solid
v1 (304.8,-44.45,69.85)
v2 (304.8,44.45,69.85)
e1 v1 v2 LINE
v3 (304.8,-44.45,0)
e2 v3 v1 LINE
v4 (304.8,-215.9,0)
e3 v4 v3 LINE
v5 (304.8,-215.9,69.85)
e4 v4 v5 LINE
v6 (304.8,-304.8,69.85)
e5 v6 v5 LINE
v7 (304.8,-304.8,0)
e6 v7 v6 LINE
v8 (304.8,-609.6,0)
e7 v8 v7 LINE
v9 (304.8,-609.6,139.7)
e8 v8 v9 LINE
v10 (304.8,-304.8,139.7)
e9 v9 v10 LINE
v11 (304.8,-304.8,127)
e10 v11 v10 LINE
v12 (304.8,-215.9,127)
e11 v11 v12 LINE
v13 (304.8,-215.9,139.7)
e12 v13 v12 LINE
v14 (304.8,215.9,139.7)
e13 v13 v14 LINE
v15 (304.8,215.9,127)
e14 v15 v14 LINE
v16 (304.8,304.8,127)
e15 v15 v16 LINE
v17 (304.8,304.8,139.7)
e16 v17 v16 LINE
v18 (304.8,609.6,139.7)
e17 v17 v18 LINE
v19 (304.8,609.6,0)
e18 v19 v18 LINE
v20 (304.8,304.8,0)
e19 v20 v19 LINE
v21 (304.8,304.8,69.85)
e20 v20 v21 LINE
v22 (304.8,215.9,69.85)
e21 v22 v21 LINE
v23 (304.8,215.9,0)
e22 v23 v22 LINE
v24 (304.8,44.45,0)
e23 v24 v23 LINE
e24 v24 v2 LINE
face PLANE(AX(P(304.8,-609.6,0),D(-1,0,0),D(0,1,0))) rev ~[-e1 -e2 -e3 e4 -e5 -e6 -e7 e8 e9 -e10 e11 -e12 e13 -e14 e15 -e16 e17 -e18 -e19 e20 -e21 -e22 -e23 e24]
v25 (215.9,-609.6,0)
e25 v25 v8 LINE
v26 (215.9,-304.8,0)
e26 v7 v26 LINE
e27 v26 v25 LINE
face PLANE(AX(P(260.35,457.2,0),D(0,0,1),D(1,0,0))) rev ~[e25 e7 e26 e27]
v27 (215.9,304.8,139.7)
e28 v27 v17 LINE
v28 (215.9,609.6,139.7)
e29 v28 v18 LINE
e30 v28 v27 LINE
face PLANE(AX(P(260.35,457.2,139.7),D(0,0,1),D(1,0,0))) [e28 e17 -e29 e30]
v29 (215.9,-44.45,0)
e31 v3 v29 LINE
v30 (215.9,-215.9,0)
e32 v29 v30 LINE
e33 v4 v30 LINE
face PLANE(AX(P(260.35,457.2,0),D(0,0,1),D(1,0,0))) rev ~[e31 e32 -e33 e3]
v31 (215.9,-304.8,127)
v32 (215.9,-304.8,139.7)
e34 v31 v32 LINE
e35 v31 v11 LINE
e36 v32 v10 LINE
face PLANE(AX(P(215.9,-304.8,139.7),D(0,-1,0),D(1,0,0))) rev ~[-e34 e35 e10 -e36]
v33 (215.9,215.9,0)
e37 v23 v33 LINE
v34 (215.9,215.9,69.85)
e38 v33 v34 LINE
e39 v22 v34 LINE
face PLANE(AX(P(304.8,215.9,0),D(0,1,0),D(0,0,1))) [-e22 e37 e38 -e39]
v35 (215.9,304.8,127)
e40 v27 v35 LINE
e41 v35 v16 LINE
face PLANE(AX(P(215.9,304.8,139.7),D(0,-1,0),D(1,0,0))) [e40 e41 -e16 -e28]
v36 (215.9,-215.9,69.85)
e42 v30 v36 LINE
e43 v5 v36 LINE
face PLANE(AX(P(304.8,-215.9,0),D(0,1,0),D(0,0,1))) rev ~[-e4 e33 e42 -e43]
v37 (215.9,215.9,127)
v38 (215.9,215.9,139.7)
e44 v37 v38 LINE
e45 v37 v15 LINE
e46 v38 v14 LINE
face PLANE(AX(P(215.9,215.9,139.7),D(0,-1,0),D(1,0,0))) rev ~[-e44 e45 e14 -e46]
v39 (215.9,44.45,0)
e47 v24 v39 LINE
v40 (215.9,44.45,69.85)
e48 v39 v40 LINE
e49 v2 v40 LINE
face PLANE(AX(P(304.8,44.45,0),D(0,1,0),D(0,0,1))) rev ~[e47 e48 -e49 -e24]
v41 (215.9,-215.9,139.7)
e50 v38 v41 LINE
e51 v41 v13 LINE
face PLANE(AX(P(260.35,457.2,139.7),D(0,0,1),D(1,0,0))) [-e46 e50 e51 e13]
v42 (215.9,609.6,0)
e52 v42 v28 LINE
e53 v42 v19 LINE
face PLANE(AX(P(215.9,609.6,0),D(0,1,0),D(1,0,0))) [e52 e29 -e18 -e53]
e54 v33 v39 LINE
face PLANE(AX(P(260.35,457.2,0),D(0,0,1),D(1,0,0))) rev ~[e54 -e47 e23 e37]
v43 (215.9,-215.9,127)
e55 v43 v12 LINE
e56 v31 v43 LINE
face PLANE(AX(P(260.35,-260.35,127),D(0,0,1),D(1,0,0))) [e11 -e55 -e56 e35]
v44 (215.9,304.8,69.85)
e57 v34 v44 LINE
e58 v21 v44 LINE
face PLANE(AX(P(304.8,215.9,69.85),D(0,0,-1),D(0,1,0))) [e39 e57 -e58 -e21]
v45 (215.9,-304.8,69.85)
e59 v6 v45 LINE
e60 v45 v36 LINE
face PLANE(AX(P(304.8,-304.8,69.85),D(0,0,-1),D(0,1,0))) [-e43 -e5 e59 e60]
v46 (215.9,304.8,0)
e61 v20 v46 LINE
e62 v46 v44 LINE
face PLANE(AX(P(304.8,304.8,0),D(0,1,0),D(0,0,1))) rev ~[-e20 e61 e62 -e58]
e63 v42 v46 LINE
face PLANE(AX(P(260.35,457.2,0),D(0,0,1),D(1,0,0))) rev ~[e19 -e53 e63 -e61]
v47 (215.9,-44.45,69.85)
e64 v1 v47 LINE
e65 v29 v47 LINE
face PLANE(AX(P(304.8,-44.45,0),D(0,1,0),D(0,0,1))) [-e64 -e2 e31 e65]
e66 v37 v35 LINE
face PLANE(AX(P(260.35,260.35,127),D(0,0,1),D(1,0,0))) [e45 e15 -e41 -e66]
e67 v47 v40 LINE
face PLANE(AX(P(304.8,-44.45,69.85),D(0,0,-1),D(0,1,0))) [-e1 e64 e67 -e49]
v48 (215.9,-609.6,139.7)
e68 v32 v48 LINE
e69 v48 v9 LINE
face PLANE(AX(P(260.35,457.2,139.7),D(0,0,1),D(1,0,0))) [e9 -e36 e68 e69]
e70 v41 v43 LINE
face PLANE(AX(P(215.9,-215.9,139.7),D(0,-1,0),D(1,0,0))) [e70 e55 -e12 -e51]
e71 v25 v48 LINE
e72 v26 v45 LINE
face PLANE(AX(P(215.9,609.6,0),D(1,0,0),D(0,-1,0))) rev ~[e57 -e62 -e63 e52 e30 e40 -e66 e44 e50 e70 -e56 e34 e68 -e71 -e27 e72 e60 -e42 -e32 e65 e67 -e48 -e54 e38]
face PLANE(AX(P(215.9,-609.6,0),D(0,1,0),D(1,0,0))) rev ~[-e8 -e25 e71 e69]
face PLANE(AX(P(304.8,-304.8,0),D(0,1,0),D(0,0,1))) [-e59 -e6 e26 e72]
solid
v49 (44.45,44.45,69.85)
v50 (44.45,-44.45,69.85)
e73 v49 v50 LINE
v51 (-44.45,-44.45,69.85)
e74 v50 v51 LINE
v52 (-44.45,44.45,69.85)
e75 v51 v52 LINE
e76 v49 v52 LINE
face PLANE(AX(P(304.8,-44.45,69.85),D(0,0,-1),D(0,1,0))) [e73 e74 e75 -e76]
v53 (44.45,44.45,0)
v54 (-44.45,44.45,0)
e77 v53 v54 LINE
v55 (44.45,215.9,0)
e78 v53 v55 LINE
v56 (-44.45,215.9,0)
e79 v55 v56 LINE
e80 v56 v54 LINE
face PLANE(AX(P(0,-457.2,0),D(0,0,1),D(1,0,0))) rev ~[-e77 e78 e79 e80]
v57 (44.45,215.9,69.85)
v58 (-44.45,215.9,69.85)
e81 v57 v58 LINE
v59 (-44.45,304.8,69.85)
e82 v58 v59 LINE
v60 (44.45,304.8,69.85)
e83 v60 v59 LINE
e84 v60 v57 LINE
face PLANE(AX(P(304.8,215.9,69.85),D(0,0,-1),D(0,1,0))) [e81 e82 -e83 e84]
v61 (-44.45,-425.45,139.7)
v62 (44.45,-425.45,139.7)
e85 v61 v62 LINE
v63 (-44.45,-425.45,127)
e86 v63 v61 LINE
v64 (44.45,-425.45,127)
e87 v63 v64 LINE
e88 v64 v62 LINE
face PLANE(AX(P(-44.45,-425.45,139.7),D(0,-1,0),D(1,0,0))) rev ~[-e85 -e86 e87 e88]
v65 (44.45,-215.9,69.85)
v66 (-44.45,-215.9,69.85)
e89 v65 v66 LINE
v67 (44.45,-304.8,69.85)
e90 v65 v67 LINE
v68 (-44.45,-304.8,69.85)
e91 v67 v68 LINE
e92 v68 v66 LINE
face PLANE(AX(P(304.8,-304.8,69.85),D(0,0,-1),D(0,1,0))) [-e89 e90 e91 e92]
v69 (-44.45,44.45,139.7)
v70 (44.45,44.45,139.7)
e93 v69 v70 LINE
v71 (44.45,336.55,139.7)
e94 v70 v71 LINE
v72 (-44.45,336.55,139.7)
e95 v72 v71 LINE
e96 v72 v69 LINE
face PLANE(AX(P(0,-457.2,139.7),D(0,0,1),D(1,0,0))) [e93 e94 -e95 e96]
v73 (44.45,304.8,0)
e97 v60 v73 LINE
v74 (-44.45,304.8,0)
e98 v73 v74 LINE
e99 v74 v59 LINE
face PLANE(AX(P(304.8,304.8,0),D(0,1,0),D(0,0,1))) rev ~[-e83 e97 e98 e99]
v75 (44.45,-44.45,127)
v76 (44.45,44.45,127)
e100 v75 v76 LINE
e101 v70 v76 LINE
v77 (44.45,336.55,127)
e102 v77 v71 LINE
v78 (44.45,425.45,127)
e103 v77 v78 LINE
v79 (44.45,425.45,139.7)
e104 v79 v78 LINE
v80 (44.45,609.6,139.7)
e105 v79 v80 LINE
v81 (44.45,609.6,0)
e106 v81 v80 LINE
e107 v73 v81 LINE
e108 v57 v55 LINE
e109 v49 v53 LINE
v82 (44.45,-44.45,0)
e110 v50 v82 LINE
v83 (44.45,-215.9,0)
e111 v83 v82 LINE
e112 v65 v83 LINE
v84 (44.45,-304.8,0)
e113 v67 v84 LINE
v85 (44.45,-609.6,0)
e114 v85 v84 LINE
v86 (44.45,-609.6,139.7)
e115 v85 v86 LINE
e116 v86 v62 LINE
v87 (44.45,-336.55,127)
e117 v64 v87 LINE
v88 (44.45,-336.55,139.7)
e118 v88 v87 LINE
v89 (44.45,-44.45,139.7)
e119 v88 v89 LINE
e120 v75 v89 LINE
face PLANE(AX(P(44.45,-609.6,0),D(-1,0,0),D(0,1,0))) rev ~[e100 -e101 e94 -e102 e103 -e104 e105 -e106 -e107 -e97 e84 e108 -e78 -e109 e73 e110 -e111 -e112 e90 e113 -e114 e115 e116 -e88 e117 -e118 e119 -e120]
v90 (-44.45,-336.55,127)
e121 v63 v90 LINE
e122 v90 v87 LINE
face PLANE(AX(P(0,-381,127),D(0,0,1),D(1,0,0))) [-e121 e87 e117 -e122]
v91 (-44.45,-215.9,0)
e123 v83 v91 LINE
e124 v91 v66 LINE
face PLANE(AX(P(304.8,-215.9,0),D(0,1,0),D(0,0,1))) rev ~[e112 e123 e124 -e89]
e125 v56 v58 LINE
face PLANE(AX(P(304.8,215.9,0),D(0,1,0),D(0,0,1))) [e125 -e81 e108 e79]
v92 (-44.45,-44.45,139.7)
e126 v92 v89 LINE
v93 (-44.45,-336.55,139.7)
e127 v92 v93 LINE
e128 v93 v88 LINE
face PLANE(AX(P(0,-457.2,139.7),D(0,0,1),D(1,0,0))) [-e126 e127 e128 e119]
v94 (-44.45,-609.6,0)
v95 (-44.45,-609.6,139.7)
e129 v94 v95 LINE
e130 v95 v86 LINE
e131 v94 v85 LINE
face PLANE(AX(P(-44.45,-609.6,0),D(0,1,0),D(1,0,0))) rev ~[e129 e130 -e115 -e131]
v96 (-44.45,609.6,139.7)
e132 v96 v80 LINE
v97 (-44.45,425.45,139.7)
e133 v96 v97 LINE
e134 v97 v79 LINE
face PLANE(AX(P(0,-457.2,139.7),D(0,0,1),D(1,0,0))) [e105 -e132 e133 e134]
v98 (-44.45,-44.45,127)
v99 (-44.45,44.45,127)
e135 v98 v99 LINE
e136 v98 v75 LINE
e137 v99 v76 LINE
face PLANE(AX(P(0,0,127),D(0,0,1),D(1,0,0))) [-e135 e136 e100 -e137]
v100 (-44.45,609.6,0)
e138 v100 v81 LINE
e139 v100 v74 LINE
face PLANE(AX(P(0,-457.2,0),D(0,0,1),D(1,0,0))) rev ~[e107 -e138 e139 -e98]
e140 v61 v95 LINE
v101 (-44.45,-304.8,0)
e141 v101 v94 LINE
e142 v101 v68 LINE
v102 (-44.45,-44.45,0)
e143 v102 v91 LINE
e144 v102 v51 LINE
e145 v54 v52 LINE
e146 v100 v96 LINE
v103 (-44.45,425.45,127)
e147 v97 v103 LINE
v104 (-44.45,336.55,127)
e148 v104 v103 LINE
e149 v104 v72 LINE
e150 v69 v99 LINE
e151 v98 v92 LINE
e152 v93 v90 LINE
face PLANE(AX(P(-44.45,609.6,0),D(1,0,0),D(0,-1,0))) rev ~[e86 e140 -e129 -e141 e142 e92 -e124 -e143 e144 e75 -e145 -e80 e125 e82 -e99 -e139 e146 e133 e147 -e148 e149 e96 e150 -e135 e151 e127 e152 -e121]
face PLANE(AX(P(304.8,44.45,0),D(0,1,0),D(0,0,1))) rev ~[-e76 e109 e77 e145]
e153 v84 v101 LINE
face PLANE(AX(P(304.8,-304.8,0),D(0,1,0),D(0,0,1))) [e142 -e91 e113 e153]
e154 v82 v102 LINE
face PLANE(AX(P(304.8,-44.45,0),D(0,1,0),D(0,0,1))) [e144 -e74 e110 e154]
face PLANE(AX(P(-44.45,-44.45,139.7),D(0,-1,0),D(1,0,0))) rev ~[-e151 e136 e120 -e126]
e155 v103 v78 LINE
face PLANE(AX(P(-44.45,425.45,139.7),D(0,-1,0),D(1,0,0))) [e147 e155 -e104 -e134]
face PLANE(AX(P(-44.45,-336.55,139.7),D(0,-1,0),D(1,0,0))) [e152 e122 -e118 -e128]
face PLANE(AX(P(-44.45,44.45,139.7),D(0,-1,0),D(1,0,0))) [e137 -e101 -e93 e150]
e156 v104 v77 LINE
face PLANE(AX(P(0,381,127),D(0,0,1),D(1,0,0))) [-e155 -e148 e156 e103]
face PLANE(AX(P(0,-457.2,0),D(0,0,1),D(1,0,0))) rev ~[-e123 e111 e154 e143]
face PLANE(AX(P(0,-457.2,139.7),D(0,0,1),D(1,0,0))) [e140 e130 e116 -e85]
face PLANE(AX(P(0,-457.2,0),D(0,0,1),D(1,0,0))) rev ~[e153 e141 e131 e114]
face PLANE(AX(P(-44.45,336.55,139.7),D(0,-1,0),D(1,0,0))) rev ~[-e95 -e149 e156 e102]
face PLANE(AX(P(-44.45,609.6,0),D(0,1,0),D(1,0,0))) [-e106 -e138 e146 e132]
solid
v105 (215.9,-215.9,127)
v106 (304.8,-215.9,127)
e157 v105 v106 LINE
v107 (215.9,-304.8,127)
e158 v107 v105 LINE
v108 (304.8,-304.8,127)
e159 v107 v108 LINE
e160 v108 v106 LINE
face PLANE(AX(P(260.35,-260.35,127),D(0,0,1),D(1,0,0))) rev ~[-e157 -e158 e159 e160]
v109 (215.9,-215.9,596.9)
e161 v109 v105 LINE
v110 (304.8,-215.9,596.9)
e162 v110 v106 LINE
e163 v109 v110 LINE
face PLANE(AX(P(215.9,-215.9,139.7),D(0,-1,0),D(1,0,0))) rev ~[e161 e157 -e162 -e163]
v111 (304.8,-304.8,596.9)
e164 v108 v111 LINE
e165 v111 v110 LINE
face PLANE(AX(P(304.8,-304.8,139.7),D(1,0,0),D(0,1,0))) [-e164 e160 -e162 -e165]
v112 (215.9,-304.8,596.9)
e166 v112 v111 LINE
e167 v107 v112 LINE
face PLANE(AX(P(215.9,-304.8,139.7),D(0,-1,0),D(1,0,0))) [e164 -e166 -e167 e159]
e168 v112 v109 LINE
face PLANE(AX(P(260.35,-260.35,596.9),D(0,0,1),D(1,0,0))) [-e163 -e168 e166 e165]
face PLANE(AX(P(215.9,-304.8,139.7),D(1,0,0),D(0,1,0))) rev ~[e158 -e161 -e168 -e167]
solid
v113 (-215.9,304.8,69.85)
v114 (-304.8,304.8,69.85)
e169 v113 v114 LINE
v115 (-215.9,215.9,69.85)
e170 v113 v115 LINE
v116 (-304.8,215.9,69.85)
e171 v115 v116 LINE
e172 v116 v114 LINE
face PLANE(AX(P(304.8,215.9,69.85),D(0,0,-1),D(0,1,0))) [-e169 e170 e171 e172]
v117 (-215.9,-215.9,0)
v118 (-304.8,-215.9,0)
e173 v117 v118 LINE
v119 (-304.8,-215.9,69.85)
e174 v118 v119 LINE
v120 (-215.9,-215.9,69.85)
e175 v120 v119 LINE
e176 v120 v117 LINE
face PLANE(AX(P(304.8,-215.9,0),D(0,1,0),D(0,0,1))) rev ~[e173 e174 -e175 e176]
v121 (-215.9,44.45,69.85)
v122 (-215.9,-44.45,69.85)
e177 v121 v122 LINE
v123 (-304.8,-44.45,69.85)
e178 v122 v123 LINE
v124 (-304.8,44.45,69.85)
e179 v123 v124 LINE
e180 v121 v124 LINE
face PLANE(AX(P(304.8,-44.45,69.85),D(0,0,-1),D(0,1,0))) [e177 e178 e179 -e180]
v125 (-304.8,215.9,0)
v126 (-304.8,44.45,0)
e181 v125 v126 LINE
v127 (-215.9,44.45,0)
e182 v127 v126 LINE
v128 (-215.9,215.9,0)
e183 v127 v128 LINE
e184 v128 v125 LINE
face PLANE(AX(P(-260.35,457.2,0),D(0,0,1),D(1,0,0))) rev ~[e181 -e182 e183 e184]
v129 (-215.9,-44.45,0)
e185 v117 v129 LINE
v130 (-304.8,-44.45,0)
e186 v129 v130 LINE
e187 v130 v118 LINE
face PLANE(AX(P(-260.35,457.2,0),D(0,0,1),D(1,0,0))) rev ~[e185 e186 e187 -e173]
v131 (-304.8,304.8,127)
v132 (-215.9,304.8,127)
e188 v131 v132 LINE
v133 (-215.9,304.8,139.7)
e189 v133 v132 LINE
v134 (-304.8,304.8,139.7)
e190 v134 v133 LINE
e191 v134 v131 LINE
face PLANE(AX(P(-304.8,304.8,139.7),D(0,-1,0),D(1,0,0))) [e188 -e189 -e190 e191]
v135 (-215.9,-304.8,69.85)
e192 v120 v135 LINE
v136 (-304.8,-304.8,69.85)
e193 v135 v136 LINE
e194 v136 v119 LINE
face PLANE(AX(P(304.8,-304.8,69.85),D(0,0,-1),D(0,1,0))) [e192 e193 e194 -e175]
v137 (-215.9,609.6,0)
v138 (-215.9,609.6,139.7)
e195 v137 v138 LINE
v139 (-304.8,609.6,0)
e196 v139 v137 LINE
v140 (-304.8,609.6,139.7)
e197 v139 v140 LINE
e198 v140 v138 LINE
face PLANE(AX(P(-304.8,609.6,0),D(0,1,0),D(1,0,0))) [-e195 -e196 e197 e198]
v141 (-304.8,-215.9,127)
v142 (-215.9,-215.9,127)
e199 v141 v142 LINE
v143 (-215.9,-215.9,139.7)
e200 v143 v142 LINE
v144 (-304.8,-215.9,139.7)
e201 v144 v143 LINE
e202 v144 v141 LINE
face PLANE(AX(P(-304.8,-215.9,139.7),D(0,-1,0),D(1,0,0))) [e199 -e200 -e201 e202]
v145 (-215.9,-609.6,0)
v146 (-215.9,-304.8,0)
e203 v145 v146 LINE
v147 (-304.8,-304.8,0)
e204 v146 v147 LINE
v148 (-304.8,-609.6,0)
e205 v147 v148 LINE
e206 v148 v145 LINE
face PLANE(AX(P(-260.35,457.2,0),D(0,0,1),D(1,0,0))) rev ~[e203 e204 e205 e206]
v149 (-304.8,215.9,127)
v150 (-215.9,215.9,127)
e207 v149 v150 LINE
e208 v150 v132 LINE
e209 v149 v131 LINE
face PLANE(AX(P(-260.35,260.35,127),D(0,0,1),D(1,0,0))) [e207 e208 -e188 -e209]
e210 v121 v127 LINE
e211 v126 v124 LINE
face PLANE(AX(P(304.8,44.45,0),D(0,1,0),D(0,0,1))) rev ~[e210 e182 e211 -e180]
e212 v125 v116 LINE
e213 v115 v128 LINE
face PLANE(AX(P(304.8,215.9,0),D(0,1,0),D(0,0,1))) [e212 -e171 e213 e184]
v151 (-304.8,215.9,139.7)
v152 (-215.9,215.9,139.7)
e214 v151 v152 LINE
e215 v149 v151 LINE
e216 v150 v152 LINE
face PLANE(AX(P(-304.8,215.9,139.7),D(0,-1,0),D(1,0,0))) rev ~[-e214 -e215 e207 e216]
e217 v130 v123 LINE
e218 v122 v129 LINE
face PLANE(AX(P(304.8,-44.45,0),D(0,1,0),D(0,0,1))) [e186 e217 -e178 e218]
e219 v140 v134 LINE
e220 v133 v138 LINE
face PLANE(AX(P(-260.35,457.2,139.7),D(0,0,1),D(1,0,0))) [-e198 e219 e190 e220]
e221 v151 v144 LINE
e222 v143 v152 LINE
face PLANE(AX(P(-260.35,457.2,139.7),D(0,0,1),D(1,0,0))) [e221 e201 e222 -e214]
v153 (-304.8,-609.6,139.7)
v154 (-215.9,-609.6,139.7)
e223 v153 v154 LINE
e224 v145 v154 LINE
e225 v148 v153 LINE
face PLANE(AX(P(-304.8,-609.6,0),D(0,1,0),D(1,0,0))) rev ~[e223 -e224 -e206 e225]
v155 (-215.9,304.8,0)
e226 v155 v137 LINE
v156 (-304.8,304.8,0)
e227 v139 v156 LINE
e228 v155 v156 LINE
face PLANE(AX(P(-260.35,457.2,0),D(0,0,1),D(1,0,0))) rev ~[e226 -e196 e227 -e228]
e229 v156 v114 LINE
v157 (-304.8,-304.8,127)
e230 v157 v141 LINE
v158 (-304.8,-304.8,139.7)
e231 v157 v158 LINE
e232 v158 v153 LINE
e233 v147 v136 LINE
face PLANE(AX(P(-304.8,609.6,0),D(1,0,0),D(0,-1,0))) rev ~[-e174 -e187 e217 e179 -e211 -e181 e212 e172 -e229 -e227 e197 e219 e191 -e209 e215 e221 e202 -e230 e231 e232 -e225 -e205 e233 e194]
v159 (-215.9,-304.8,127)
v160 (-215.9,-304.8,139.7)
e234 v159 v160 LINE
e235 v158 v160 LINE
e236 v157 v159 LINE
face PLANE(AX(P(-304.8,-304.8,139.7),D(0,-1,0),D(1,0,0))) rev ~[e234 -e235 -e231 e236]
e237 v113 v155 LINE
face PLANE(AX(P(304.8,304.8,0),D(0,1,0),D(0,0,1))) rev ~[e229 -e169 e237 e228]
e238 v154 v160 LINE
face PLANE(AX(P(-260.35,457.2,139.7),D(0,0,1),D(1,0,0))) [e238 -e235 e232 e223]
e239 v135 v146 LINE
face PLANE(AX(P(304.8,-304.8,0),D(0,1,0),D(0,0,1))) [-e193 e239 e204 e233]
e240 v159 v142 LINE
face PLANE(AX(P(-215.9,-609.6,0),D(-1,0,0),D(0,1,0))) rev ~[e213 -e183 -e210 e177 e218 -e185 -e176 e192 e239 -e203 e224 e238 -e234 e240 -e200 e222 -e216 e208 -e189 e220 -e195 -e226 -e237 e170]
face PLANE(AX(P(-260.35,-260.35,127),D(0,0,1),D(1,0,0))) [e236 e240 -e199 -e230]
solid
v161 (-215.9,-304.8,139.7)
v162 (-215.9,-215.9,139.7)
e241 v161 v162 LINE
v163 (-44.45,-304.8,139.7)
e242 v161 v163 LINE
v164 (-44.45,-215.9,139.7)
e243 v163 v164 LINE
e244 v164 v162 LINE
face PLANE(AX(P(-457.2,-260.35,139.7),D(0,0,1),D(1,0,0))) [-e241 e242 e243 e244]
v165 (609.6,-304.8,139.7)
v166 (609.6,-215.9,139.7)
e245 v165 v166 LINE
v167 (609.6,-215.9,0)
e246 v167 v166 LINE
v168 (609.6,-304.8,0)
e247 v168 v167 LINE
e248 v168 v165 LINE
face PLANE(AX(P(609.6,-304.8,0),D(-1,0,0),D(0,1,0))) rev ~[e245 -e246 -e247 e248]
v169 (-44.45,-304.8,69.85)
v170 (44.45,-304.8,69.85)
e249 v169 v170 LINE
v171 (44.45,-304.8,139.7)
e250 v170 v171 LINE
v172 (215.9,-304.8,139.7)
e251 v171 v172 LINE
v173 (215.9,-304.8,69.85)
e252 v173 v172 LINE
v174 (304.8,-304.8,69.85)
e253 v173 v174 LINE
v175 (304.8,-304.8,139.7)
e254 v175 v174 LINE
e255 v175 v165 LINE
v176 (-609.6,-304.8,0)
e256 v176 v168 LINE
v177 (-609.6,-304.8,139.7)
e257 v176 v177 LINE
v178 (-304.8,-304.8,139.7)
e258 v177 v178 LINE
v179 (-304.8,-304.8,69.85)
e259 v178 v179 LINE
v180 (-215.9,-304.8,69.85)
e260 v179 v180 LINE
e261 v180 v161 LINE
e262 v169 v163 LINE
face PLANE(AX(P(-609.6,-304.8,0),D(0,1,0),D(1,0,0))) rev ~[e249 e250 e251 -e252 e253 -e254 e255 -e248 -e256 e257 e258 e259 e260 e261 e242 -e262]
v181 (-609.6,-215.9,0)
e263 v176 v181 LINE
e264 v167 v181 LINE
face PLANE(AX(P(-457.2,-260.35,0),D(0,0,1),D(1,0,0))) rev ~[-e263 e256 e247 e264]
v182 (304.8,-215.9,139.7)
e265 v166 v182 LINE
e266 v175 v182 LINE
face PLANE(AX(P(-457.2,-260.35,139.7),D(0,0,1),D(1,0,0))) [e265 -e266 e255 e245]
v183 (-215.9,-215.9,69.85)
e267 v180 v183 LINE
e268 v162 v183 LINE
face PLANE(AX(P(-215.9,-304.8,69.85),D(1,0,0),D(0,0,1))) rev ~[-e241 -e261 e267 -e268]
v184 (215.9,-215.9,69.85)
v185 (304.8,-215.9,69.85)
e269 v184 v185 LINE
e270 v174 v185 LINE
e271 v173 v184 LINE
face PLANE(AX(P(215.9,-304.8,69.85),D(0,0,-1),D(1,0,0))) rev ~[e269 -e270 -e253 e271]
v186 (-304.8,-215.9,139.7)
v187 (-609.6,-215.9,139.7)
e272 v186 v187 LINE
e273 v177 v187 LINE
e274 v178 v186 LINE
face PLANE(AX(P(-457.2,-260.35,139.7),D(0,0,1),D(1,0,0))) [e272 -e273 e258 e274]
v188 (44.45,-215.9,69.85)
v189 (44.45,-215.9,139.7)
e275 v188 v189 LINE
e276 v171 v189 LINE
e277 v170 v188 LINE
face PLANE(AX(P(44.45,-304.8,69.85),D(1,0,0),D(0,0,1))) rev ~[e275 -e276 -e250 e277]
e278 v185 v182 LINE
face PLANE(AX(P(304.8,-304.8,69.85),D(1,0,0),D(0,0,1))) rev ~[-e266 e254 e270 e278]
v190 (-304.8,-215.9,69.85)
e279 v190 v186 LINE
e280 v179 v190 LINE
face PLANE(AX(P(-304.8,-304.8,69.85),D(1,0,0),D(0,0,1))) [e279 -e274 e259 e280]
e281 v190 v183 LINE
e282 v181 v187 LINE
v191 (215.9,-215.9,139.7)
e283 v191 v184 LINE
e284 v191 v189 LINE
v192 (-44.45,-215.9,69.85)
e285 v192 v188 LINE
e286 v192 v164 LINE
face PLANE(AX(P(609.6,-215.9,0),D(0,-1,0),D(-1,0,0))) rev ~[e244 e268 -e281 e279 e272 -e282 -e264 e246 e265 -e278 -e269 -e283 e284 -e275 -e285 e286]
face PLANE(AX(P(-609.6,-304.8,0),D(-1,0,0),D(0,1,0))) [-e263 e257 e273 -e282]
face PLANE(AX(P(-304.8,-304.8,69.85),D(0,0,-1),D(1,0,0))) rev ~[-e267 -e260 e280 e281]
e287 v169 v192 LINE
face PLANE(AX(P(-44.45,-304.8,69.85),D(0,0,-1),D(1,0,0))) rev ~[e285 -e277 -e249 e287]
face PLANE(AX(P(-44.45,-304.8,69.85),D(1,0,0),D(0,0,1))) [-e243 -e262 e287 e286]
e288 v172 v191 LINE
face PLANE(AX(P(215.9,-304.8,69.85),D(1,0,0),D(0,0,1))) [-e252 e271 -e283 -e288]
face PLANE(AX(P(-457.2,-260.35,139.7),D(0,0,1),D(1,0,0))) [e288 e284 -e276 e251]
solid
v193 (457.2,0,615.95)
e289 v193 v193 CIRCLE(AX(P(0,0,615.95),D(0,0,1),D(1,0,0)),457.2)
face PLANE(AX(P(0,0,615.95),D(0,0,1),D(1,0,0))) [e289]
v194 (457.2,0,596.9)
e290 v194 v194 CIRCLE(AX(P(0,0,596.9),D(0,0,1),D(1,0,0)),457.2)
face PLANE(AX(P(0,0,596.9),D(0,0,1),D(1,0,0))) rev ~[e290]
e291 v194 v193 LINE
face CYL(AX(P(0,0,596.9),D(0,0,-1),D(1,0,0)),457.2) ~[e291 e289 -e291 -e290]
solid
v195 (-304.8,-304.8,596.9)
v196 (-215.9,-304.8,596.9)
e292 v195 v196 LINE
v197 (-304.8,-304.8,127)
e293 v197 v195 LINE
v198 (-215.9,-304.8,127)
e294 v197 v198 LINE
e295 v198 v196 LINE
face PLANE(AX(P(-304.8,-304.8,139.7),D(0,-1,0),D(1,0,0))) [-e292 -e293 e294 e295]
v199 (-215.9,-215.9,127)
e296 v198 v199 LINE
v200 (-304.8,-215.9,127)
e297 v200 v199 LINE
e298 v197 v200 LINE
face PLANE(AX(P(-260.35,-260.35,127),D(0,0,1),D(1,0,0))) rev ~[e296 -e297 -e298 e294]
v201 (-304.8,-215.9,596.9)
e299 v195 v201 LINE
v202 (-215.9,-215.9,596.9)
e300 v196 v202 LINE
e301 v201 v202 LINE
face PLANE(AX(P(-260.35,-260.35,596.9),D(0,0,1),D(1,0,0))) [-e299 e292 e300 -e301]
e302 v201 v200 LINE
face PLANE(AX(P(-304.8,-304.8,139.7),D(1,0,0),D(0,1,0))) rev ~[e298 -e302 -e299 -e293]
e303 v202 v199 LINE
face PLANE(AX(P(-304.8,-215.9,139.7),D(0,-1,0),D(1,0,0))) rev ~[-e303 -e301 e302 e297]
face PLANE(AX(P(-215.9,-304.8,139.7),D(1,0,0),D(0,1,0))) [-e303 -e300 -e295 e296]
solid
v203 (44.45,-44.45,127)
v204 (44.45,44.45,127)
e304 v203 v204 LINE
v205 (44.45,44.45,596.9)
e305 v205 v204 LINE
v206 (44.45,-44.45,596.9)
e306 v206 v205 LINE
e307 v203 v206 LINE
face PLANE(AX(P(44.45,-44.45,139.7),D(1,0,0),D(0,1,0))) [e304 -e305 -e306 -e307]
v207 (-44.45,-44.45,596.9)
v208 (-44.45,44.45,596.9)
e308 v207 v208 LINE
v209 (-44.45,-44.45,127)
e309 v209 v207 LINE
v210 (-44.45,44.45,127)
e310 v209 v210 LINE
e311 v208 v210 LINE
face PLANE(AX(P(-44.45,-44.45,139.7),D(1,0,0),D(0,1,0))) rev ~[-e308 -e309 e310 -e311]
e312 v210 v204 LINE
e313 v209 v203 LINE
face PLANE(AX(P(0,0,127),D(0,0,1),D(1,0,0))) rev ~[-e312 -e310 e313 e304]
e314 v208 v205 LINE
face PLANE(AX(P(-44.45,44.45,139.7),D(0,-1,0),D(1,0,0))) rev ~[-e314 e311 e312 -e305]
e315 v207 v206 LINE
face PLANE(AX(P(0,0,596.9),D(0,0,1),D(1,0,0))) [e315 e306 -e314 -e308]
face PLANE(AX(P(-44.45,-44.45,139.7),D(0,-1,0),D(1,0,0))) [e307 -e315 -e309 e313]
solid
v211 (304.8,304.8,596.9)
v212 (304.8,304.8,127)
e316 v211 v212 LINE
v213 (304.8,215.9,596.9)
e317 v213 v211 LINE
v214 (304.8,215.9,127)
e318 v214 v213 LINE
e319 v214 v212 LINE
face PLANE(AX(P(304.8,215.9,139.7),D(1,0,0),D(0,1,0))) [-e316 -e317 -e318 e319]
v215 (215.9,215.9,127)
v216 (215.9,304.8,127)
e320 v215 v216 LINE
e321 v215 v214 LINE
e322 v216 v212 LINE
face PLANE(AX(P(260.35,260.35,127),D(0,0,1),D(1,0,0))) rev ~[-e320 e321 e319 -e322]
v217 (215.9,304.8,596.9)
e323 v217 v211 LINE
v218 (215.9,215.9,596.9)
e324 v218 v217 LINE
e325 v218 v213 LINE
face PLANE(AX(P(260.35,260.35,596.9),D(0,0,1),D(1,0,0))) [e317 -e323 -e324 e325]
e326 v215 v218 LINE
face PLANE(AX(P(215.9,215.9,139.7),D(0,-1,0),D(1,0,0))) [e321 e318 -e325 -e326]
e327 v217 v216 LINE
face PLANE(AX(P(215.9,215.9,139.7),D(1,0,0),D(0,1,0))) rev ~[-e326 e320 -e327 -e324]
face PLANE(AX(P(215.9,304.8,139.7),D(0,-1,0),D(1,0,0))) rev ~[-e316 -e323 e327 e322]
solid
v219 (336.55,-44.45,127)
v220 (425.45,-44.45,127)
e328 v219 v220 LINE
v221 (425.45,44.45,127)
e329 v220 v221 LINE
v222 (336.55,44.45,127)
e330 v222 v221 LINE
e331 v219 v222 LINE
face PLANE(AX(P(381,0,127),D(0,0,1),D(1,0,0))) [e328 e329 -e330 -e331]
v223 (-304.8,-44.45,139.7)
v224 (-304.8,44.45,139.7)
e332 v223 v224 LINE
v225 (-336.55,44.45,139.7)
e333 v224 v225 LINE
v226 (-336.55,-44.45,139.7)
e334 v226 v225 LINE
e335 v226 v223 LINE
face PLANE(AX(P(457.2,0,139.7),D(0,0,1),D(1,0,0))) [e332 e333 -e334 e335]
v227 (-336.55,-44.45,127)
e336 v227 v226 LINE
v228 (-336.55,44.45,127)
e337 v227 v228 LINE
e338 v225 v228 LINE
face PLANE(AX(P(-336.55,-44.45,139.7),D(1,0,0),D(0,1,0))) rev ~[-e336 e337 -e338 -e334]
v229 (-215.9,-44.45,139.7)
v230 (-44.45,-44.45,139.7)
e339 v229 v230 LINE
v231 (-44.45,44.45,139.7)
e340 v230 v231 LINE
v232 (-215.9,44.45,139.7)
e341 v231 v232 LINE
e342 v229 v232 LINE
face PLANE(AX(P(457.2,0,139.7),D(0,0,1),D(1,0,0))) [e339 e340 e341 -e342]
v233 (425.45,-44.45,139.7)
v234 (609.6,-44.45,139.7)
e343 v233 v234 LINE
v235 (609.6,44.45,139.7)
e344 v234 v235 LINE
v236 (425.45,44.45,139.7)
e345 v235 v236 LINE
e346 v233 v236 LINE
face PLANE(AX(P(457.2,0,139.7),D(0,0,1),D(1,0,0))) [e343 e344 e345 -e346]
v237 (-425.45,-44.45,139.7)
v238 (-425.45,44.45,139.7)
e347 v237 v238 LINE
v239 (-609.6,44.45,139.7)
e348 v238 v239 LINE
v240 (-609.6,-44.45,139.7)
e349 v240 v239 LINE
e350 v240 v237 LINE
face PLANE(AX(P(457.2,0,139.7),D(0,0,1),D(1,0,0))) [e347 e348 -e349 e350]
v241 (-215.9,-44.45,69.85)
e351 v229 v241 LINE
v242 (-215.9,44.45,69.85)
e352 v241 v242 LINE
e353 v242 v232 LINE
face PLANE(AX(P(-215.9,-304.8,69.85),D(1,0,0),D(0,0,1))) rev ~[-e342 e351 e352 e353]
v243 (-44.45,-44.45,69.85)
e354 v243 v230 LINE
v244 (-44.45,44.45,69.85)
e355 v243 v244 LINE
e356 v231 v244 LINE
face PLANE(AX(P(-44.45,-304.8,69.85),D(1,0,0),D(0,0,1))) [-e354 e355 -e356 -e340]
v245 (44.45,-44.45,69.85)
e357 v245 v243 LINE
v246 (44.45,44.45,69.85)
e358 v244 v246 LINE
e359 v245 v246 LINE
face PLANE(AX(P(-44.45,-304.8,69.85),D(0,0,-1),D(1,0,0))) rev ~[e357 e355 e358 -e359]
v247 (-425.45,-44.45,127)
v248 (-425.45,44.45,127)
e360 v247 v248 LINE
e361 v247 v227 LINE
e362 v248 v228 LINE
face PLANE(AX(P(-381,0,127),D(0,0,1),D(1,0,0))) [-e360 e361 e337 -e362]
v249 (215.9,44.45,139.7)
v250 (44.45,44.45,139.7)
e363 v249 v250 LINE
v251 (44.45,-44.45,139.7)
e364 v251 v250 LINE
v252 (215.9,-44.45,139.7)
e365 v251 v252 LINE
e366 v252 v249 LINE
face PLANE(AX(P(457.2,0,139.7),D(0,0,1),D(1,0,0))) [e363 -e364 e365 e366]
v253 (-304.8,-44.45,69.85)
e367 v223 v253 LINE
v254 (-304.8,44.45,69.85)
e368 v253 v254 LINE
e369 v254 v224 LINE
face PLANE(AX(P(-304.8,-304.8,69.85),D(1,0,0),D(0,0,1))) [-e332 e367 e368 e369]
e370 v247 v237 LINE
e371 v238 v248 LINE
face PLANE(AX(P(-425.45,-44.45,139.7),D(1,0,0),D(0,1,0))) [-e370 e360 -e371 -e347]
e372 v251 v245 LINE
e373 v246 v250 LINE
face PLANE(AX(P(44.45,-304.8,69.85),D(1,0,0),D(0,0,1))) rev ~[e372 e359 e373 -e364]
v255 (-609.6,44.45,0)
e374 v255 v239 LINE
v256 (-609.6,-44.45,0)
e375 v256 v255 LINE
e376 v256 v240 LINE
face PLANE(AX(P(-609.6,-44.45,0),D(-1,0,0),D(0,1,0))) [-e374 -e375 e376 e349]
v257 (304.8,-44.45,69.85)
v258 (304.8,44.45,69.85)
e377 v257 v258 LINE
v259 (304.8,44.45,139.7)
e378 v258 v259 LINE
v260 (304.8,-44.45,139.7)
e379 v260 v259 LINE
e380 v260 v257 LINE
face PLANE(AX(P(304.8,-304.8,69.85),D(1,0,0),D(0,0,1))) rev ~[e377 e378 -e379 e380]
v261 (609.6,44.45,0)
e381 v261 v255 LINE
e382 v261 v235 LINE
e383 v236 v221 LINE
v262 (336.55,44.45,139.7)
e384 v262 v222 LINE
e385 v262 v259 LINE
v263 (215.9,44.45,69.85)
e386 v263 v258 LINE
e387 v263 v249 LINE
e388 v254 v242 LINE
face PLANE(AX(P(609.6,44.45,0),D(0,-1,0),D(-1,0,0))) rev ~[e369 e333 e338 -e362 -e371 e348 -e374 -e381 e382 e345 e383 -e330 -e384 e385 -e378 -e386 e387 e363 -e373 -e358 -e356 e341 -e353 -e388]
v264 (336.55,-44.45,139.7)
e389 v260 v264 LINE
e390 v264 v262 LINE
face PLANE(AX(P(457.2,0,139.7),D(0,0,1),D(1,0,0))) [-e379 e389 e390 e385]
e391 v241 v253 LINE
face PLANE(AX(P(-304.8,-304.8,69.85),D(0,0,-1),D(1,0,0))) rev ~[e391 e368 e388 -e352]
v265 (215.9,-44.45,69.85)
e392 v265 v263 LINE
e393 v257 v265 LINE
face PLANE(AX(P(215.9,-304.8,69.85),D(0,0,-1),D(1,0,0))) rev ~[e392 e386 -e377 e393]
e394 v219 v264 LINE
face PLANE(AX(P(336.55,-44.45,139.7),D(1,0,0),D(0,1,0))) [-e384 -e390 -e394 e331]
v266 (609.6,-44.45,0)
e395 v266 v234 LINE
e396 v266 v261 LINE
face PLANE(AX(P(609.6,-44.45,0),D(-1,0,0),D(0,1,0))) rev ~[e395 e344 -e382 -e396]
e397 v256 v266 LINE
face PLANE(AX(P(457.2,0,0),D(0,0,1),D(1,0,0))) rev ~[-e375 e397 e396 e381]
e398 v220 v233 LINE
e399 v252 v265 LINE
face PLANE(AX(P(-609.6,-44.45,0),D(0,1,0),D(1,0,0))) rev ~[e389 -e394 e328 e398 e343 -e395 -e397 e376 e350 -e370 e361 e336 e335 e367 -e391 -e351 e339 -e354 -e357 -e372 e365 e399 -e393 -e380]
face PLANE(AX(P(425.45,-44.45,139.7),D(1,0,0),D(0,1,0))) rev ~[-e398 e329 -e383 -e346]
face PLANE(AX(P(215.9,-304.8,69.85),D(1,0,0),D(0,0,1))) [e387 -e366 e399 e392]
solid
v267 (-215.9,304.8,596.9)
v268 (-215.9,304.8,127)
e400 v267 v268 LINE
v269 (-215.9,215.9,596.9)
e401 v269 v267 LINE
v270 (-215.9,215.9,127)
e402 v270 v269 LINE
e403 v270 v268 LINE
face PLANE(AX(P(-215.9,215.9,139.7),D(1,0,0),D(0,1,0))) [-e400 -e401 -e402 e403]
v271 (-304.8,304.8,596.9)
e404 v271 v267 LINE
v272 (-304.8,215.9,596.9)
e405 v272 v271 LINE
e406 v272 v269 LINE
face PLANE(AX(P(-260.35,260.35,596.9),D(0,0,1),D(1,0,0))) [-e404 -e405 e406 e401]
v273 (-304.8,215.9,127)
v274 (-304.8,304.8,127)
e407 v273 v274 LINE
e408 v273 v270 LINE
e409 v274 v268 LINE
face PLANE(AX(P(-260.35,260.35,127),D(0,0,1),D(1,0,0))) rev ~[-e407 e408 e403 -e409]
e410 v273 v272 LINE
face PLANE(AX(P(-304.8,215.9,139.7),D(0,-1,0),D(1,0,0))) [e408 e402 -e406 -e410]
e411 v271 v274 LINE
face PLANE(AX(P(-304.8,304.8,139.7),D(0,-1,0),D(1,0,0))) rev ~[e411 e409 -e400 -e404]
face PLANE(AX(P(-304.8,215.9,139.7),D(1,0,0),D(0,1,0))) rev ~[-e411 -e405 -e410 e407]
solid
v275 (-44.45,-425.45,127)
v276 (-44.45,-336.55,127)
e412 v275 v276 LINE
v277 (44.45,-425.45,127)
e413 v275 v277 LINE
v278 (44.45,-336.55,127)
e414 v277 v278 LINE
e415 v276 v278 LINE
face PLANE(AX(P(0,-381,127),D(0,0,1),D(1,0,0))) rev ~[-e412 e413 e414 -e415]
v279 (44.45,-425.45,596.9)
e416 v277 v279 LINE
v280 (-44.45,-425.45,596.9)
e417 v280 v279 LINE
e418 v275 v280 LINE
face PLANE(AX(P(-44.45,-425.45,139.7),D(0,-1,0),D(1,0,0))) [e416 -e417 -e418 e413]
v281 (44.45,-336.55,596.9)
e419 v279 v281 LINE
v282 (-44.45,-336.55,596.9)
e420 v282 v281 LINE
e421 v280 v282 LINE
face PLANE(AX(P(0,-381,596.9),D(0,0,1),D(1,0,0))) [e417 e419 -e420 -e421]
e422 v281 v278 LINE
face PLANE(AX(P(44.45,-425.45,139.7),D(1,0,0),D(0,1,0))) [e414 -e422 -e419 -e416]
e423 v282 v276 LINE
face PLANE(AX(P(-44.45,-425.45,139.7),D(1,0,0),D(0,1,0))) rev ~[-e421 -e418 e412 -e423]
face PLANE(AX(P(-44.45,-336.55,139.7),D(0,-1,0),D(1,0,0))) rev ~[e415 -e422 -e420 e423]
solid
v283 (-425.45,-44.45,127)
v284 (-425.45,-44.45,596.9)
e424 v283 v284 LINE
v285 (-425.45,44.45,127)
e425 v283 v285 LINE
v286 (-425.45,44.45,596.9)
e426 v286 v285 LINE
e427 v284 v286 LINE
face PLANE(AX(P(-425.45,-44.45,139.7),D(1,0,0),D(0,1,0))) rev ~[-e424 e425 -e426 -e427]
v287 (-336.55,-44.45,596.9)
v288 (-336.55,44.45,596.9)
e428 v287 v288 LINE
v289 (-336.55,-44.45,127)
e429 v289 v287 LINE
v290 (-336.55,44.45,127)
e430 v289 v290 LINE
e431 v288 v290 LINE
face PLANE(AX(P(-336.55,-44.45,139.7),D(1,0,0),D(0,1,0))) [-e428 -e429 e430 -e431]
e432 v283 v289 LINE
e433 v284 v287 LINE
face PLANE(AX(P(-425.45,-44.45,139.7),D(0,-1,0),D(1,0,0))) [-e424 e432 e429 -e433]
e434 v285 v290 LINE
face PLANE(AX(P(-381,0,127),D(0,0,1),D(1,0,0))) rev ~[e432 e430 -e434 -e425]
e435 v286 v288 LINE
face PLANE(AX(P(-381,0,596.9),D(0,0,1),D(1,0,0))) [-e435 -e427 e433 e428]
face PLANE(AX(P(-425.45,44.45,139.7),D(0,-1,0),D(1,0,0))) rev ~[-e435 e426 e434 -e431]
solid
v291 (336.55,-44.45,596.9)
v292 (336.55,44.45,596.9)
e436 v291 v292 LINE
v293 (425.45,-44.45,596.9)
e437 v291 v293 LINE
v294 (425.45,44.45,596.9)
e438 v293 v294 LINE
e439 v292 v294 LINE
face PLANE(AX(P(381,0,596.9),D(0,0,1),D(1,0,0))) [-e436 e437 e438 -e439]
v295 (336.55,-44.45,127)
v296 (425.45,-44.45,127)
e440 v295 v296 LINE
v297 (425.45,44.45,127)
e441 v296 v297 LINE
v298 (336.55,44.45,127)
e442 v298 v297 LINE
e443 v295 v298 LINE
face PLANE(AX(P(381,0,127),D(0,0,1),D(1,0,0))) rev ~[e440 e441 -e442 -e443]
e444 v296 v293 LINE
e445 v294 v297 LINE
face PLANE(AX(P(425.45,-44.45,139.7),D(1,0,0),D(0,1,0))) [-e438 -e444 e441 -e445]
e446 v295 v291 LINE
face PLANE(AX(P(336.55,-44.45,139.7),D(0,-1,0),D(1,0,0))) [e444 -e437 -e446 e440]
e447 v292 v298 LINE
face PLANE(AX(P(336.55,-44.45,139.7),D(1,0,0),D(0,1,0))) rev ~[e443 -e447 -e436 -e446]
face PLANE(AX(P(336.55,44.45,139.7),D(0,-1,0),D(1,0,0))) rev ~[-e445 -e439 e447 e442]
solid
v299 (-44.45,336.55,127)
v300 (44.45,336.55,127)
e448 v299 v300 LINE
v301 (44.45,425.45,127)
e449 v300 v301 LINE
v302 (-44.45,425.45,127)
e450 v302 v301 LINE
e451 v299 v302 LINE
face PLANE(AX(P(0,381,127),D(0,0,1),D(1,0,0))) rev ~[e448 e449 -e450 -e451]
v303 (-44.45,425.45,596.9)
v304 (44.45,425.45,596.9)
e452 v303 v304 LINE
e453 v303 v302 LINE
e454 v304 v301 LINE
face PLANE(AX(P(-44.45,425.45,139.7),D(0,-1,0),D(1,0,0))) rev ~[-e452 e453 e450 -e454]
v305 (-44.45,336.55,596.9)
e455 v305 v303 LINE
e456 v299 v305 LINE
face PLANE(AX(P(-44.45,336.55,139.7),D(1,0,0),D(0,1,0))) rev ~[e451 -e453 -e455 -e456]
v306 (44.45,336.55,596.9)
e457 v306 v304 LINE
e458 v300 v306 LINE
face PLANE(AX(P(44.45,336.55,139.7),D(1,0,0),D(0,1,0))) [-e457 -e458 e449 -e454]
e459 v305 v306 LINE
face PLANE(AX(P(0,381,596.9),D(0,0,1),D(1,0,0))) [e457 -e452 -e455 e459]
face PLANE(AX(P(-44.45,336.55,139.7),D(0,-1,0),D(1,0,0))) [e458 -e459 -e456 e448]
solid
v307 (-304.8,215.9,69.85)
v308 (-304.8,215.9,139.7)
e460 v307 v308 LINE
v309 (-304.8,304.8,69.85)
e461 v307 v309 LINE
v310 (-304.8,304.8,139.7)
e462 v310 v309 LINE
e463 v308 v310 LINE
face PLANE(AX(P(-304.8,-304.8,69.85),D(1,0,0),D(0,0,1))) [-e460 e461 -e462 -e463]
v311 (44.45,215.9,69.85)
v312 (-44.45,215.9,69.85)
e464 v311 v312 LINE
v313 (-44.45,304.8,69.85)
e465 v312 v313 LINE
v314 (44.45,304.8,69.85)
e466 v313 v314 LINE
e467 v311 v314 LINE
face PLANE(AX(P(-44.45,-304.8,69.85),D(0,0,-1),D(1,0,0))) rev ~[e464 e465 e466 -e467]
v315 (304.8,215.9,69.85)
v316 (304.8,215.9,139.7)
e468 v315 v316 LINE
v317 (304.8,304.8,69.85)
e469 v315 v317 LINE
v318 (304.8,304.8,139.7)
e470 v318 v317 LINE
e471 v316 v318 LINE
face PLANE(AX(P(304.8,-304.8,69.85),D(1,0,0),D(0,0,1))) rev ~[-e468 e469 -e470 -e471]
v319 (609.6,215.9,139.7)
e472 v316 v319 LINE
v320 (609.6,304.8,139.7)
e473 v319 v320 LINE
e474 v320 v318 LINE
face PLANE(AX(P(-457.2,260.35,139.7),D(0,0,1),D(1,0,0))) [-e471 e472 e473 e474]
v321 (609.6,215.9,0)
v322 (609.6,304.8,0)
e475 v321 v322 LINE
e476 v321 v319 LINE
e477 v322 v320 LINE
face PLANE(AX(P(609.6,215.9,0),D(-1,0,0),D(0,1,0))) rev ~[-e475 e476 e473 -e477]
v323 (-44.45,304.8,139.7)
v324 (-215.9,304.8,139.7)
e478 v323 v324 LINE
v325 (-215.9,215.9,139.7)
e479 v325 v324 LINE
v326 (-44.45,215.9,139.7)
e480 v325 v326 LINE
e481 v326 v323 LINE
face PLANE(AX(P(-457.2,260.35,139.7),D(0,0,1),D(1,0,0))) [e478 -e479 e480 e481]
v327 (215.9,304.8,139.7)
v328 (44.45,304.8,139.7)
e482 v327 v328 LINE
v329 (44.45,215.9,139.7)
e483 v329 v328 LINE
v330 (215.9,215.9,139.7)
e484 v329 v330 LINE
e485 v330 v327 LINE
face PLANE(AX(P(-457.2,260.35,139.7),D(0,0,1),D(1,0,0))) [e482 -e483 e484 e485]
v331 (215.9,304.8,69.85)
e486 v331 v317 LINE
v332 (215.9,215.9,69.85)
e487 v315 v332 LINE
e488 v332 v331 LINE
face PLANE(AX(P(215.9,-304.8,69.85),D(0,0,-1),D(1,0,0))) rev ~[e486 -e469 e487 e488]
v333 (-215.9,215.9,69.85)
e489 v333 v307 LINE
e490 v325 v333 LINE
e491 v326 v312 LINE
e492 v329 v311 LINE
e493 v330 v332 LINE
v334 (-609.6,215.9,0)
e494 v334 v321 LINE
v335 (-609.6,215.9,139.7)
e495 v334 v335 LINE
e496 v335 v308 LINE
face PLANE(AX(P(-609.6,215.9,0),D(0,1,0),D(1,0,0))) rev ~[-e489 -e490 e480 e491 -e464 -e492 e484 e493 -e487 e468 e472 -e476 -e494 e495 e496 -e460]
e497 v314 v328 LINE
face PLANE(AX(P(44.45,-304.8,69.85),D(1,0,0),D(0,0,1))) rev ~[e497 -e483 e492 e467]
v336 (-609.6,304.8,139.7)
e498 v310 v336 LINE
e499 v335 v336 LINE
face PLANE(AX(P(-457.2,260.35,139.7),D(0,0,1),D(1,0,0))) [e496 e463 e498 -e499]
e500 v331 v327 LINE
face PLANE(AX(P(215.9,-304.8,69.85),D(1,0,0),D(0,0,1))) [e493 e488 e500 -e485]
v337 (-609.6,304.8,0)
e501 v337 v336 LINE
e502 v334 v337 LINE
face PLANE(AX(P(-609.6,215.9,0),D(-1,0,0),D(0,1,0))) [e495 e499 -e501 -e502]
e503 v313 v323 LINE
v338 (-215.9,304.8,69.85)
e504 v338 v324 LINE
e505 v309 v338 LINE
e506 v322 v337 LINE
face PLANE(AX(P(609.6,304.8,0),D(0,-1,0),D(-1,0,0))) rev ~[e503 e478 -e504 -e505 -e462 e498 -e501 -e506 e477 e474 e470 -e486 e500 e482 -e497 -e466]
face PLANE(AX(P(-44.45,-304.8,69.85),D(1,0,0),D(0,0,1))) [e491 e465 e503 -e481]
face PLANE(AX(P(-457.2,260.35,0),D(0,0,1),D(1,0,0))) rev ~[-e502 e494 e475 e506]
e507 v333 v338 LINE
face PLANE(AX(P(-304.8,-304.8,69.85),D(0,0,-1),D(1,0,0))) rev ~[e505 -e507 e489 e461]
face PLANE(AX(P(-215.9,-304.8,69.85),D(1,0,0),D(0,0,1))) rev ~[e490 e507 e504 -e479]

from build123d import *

# Parameters (mm, degrees)
F0_W          = 88.9
F0_H          = 304.8
F0_H_2        = 88.9
F0_H_3        = 171.45
F1_DEPTH      = 139.7
F0_W_2        = 304.8
F0_W_3        = 171.45
F2_DEPTH      = 139.7
F3_W          = 88.9
F3_H          = 69.85
F4_DEPTH      = 914.401
F5_W          = 88.9
F5_H          = 69.85
F6_DEPTH      = 914.401
F7_W          = 88.9
F7_H          = 88.9
F8_DEPTH      = 457.2
F8_DEPTH_BACK = 12.7
F10_R         = 457.2
F10_W         = 88.9
F10_H         = 88.9
F11_DEPTH     = 19.05


# Not quite as in the source:
# - a feature names something its author has since deleted; it is built from what else it names


with BuildPart() as f1:
    # F0 (on Top) → F1 (new body)
    with BuildSketch(Plane.XY):
        with Locations((-260.35, 457.2)):
            Rectangle(F0_W, F0_H)
        with Locations((-260.35, 260.35)):
            Rectangle(F0_W, F0_H_2)
        with Locations((-260.35, 130.175)):
            Rectangle(F0_W, F0_H_3)
        with Locations((-260.35, 0)):
            Rectangle(F0_W, F0_H_2)
        with Locations((-260.35, -130.175)):
            Rectangle(F0_W, F0_H_3)
        with Locations((-260.35, -260.35)):
            Rectangle(F0_W, F0_H_2)
        with Locations((-260.35, -457.2)):
            Rectangle(F0_W, F0_H)
    extrude(amount=F1_DEPTH)


with BuildPart() as f1b:
    # F0 (on Top) → F1, piece 2 (new body)
    with BuildSketch(Plane.XY):
        with Locations((0, -457.2)):
            Rectangle(F0_W, F0_H)
        with Locations((0, -260.35)):
            Rectangle(F0_W, F0_H_2)
        with Locations((0, -130.175)):
            Rectangle(F0_W, F0_H_3)
        Rectangle(F0_W, F0_H_2)
        with Locations((0, 130.175)):
            Rectangle(F0_W, F0_H_3)
        with Locations((0, 260.35)):
            Rectangle(F0_W, F0_H_2)
        with Locations((0, 457.2)):
            Rectangle(F0_W, F0_H)
    extrude(amount=F1_DEPTH)


with BuildPart() as f1c:
    # F0 (on Top) → F1, piece 3 (new body)
    with BuildSketch(Plane.XY):
        with Locations((260.35, 457.2)):
            Rectangle(F0_W, F0_H)
        with Locations((260.35, 260.35)):
            Rectangle(F0_W, F0_H_2)
        with Locations((260.35, 130.175)):
            Rectangle(F0_W, F0_H_3)
        with Locations((260.35, 0)):
            Rectangle(F0_W, F0_H_2)
        with Locations((260.35, -130.175)):
            Rectangle(F0_W, F0_H_3)
        with Locations((260.35, -260.35)):
            Rectangle(F0_W, F0_H_2)
        with Locations((260.35, -457.2)):
            Rectangle(F0_W, F0_H)
    extrude(amount=F1_DEPTH)


with BuildPart() as f2:
    # F0 (on Top) → F2 (new body)
    with BuildSketch(Plane.XY):
        with Locations((-457.2, 260.35)):
            Rectangle(F0_W_2, F0_H_2)
        with Locations((-260.35, 260.35)):
            Rectangle(F0_W, F0_H_2)
        with Locations((-130.175, 260.35)):
            Rectangle(F0_W_3, F0_H_2)
        with Locations((0, 260.35)):
            Rectangle(F0_W, F0_H_2)
        with Locations((130.175, 260.35)):
            Rectangle(F0_W_3, F0_H_2)
        with Locations((260.35, 260.35)):
            Rectangle(F0_W, F0_H_2)
        with Locations((457.2, 260.35)):
            Rectangle(F0_W_2, F0_H_2)
    extrude(amount=F2_DEPTH)


with BuildPart() as f2b:
    # F0 (on Top) → F2, piece 2 (new body)
    with BuildSketch(Plane.XY):
        with Locations((457.2, 0)):
            Rectangle(F0_W_2, F0_H_2)
        with Locations((260.35, 0)):
            Rectangle(F0_W, F0_H_2)
        with Locations((130.175, 0)):
            Rectangle(F0_W_3, F0_H_2)
        Rectangle(F0_W, F0_H_2)
        with Locations((-130.175, 0)):
            Rectangle(F0_W_3, F0_H_2)
        with Locations((-260.35, 0)):
            Rectangle(F0_W, F0_H_2)
        with Locations((-457.2, 0)):
            Rectangle(F0_W_2, F0_H_2)
    extrude(amount=F2_DEPTH)


with BuildPart() as f2c:
    # F0 (on Top) → F2, piece 3 (new body)
    with BuildSketch(Plane.XY):
        with Locations((-457.2, -260.35)):
            Rectangle(F0_W_2, F0_H_2)
        with Locations((-260.35, -260.35)):
            Rectangle(F0_W, F0_H_2)
        with Locations((-130.175, -260.35)):
            Rectangle(F0_W_3, F0_H_2)
        with Locations((0, -260.35)):
            Rectangle(F0_W, F0_H_2)
        with Locations((130.175, -260.35)):
            Rectangle(F0_W_3, F0_H_2)
        with Locations((260.35, -260.35)):
            Rectangle(F0_W, F0_H_2)
        with Locations((457.2, -260.35)):
            Rectangle(F0_W_2, F0_H_2)
    extrude(amount=F2_DEPTH)


with BuildPart() as f4_tool:
    # F3 (on face) → F4 (new body, through all)
    with BuildSketch(Plane.XZ.offset(304.8)):
        with Locations((-260.35, 104.775)):
            Rectangle(F3_W, F3_H)
        with Locations((0, 104.775)):
            Rectangle(F3_W, F3_H)
        with Locations((260.35, 104.775)):
            Rectangle(F3_W, F3_H)
    extrude(amount=-F4_DEPTH)


with BuildPart() as f2_1:
    add(f2.part)

    # F4: cut by f4_tool
    add(f4_tool.part, mode=Mode.SUBTRACT)


with BuildPart() as f2b_1:
    add(f2b.part)

    # F4: cut by f4_tool
    add(f4_tool.part, mode=Mode.SUBTRACT)


with BuildPart() as f2c_1:
    add(f2c.part)

    # F4: cut by f4_tool
    add(f4_tool.part, mode=Mode.SUBTRACT)


with BuildPart() as f6_tool:
    # F5 (on face) → F6 (new body, through all)
    with BuildSketch(Plane.YZ.offset(304.8)):
        with Locations((-260.35, 34.925)):
            Rectangle(F5_W, F5_H)
        with Locations((0, 34.925)):
            Rectangle(F5_W, F5_H)
        with Locations((260.35, 34.925)):
            Rectangle(F5_W, F5_H)
    extrude(amount=-F6_DEPTH)


with BuildPart() as f1_1:
    add(f1.part)

    # F6: cut by f6_tool
    add(f6_tool.part, mode=Mode.SUBTRACT)


with BuildPart() as f1b_1:
    add(f1b.part)

    # F6: cut by f6_tool
    add(f6_tool.part, mode=Mode.SUBTRACT)


with BuildPart() as f1c_1:
    add(f1c.part)

    # F6: cut by f6_tool
    add(f6_tool.part, mode=Mode.SUBTRACT)


with BuildPart() as f8:
    # F7 (on face) → F8 (new body, two sides)
    with BuildSketch(Plane.XY.offset(139.7)) as f8_sk:
        with Locations((-260.35, 260.35)):
            Rectangle(F7_W, F7_H)
    extrude(amount=F8_DEPTH)
    extrude(f8_sk.sketch, amount=-F8_DEPTH_BACK)


with BuildPart() as f8b:
    # F7 (on face) → F8, piece 2 (new body, two sides)
    with BuildSketch(Plane.XY.offset(139.7)) as f8_2_sk:
        with Locations((260.35, 260.35)):
            Rectangle(F7_W, F7_H)
    extrude(amount=F8_DEPTH)
    extrude(f8_2_sk.sketch, amount=-F8_DEPTH_BACK)


with BuildPart() as f8c:
    # F7 (on face) → F8, piece 3 (new body, two sides)
    with BuildSketch(Plane.XY.offset(139.7)) as f8_3_sk:
        Rectangle(F7_W, F7_H)
    extrude(amount=F8_DEPTH)
    extrude(f8_3_sk.sketch, amount=-F8_DEPTH_BACK)


with BuildPart() as f8d:
    # F7 (on face) → F8, piece 4 (new body, two sides)
    with BuildSketch(Plane.XY.offset(139.7)) as f8_4_sk:
        with Locations((0, 381)):
            Rectangle(F7_W, F7_H)
    extrude(amount=F8_DEPTH)
    extrude(f8_4_sk.sketch, amount=-F8_DEPTH_BACK)


with BuildPart() as f8e:
    # F7 (on face) → F8, piece 5 (new body, two sides)
    with BuildSketch(Plane.XY.offset(139.7)) as f8_5_sk:
        with Locations((0, -381)):
            Rectangle(F7_W, F7_H)
    extrude(amount=F8_DEPTH)
    extrude(f8_5_sk.sketch, amount=-F8_DEPTH_BACK)


with BuildPart() as f8f:
    # F7 (on face) → F8, piece 6 (new body, two sides)
    with BuildSketch(Plane.XY.offset(139.7)) as f8_6_sk:
        with Locations((-260.35, -260.35)):
            Rectangle(F7_W, F7_H)
    extrude(amount=F8_DEPTH)
    extrude(f8_6_sk.sketch, amount=-F8_DEPTH_BACK)


with BuildPart() as f8g:
    # F7 (on face) → F8, piece 7 (new body, two sides)
    with BuildSketch(Plane.XY.offset(139.7)) as f8_7_sk:
        with Locations((260.35, -260.35)):
            Rectangle(F7_W, F7_H)
    extrude(amount=F8_DEPTH)
    extrude(f8_7_sk.sketch, amount=-F8_DEPTH_BACK)


with BuildPart() as f8h:
    # F7 (on face) → F8, piece 8 (new body, two sides)
    with BuildSketch(Plane.XY.offset(139.7)) as f8_8_sk:
        with Locations((381, 0)):
            Rectangle(F7_W, F7_H)
    extrude(amount=F8_DEPTH)
    extrude(f8_8_sk.sketch, amount=-F8_DEPTH_BACK)


with BuildPart() as f8i:
    # F7 (on face) → F8, piece 9 (new body, two sides)
    with BuildSketch(Plane.XY.offset(139.7)) as f8_9_sk:
        with Locations((-381, 0)):
            Rectangle(F7_W, F7_H)
    extrude(amount=F8_DEPTH)
    extrude(f8_9_sk.sketch, amount=-F8_DEPTH_BACK)


with BuildPart() as f1_2:
    add(f1_1.part)

    # F9: cut F8i, F8, F8d, F8b, F8h, F8c, F8g, F8e, F8f
    add(f8i.part, mode=Mode.SUBTRACT)
    add(f8.part, mode=Mode.SUBTRACT)
    add(f8d.part, mode=Mode.SUBTRACT)
    add(f8b.part, mode=Mode.SUBTRACT)
    add(f8h.part, mode=Mode.SUBTRACT)
    add(f8c.part, mode=Mode.SUBTRACT)
    add(f8g.part, mode=Mode.SUBTRACT)
    add(f8e.part, mode=Mode.SUBTRACT)
    add(f8f.part, mode=Mode.SUBTRACT)


with BuildPart() as f2b_2:
    add(f2b_1.part)

    # F9: cut F8i, F8, F8d, F8b, F8h, F8c, F8g, F8e, F8f
    add(f8i.part, mode=Mode.SUBTRACT)
    add(f8.part, mode=Mode.SUBTRACT)
    add(f8d.part, mode=Mode.SUBTRACT)
    add(f8b.part, mode=Mode.SUBTRACT)
    add(f8h.part, mode=Mode.SUBTRACT)
    add(f8c.part, mode=Mode.SUBTRACT)
    add(f8g.part, mode=Mode.SUBTRACT)
    add(f8e.part, mode=Mode.SUBTRACT)
    add(f8f.part, mode=Mode.SUBTRACT)


with BuildPart() as f2_2:
    add(f2_1.part)

    # F9: cut F8i, F8, F8d, F8b, F8h, F8c, F8g, F8e, F8f
    add(f8i.part, mode=Mode.SUBTRACT)
    add(f8.part, mode=Mode.SUBTRACT)
    add(f8d.part, mode=Mode.SUBTRACT)
    add(f8b.part, mode=Mode.SUBTRACT)
    add(f8h.part, mode=Mode.SUBTRACT)
    add(f8c.part, mode=Mode.SUBTRACT)
    add(f8g.part, mode=Mode.SUBTRACT)
    add(f8e.part, mode=Mode.SUBTRACT)
    add(f8f.part, mode=Mode.SUBTRACT)


with BuildPart() as f1c_2:
    add(f1c_1.part)

    # F9: cut F8i, F8, F8d, F8b, F8h, F8c, F8g, F8e, F8f
    add(f8i.part, mode=Mode.SUBTRACT)
    add(f8.part, mode=Mode.SUBTRACT)
    add(f8d.part, mode=Mode.SUBTRACT)
    add(f8b.part, mode=Mode.SUBTRACT)
    add(f8h.part, mode=Mode.SUBTRACT)
    add(f8c.part, mode=Mode.SUBTRACT)
    add(f8g.part, mode=Mode.SUBTRACT)
    add(f8e.part, mode=Mode.SUBTRACT)
    add(f8f.part, mode=Mode.SUBTRACT)


with BuildPart() as f1b_2:
    add(f1b_1.part)

    # F9: cut F8i, F8, F8d, F8b, F8h, F8c, F8g, F8e, F8f
    add(f8i.part, mode=Mode.SUBTRACT)
    add(f8.part, mode=Mode.SUBTRACT)
    add(f8d.part, mode=Mode.SUBTRACT)
    add(f8b.part, mode=Mode.SUBTRACT)
    add(f8h.part, mode=Mode.SUBTRACT)
    add(f8c.part, mode=Mode.SUBTRACT)
    add(f8g.part, mode=Mode.SUBTRACT)
    add(f8e.part, mode=Mode.SUBTRACT)
    add(f8f.part, mode=Mode.SUBTRACT)


with BuildPart() as f2c_2:
    add(f2c_1.part)

    # F9: cut F8i, F8, F8d, F8b, F8h, F8c, F8g, F8e, F8f
    add(f8i.part, mode=Mode.SUBTRACT)
    add(f8.part, mode=Mode.SUBTRACT)
    add(f8d.part, mode=Mode.SUBTRACT)
    add(f8b.part, mode=Mode.SUBTRACT)
    add(f8h.part, mode=Mode.SUBTRACT)
    add(f8c.part, mode=Mode.SUBTRACT)
    add(f8g.part, mode=Mode.SUBTRACT)
    add(f8e.part, mode=Mode.SUBTRACT)
    add(f8f.part, mode=Mode.SUBTRACT)


with BuildPart() as f11:
    # F10 (on face) → F11 (new body)
    with BuildSketch(Plane.XY.offset(596.9)):
        Circle(F10_R)
        Rectangle(F10_W, F10_H, mode=Mode.SUBTRACT)
        Rectangle(F10_W, F10_H)
    extrude(amount=F11_DEPTH)


solid = Compound([f8.part, f8b.part, f8c.part, f8d.part, f8e.part, f8f.part, f8g.part, f8h.part, f8i.part, f1_2.part, f2b_2.part, f2_2.part, f1c_2.part, f1b_2.part, f2c_2.part, f11.part])
